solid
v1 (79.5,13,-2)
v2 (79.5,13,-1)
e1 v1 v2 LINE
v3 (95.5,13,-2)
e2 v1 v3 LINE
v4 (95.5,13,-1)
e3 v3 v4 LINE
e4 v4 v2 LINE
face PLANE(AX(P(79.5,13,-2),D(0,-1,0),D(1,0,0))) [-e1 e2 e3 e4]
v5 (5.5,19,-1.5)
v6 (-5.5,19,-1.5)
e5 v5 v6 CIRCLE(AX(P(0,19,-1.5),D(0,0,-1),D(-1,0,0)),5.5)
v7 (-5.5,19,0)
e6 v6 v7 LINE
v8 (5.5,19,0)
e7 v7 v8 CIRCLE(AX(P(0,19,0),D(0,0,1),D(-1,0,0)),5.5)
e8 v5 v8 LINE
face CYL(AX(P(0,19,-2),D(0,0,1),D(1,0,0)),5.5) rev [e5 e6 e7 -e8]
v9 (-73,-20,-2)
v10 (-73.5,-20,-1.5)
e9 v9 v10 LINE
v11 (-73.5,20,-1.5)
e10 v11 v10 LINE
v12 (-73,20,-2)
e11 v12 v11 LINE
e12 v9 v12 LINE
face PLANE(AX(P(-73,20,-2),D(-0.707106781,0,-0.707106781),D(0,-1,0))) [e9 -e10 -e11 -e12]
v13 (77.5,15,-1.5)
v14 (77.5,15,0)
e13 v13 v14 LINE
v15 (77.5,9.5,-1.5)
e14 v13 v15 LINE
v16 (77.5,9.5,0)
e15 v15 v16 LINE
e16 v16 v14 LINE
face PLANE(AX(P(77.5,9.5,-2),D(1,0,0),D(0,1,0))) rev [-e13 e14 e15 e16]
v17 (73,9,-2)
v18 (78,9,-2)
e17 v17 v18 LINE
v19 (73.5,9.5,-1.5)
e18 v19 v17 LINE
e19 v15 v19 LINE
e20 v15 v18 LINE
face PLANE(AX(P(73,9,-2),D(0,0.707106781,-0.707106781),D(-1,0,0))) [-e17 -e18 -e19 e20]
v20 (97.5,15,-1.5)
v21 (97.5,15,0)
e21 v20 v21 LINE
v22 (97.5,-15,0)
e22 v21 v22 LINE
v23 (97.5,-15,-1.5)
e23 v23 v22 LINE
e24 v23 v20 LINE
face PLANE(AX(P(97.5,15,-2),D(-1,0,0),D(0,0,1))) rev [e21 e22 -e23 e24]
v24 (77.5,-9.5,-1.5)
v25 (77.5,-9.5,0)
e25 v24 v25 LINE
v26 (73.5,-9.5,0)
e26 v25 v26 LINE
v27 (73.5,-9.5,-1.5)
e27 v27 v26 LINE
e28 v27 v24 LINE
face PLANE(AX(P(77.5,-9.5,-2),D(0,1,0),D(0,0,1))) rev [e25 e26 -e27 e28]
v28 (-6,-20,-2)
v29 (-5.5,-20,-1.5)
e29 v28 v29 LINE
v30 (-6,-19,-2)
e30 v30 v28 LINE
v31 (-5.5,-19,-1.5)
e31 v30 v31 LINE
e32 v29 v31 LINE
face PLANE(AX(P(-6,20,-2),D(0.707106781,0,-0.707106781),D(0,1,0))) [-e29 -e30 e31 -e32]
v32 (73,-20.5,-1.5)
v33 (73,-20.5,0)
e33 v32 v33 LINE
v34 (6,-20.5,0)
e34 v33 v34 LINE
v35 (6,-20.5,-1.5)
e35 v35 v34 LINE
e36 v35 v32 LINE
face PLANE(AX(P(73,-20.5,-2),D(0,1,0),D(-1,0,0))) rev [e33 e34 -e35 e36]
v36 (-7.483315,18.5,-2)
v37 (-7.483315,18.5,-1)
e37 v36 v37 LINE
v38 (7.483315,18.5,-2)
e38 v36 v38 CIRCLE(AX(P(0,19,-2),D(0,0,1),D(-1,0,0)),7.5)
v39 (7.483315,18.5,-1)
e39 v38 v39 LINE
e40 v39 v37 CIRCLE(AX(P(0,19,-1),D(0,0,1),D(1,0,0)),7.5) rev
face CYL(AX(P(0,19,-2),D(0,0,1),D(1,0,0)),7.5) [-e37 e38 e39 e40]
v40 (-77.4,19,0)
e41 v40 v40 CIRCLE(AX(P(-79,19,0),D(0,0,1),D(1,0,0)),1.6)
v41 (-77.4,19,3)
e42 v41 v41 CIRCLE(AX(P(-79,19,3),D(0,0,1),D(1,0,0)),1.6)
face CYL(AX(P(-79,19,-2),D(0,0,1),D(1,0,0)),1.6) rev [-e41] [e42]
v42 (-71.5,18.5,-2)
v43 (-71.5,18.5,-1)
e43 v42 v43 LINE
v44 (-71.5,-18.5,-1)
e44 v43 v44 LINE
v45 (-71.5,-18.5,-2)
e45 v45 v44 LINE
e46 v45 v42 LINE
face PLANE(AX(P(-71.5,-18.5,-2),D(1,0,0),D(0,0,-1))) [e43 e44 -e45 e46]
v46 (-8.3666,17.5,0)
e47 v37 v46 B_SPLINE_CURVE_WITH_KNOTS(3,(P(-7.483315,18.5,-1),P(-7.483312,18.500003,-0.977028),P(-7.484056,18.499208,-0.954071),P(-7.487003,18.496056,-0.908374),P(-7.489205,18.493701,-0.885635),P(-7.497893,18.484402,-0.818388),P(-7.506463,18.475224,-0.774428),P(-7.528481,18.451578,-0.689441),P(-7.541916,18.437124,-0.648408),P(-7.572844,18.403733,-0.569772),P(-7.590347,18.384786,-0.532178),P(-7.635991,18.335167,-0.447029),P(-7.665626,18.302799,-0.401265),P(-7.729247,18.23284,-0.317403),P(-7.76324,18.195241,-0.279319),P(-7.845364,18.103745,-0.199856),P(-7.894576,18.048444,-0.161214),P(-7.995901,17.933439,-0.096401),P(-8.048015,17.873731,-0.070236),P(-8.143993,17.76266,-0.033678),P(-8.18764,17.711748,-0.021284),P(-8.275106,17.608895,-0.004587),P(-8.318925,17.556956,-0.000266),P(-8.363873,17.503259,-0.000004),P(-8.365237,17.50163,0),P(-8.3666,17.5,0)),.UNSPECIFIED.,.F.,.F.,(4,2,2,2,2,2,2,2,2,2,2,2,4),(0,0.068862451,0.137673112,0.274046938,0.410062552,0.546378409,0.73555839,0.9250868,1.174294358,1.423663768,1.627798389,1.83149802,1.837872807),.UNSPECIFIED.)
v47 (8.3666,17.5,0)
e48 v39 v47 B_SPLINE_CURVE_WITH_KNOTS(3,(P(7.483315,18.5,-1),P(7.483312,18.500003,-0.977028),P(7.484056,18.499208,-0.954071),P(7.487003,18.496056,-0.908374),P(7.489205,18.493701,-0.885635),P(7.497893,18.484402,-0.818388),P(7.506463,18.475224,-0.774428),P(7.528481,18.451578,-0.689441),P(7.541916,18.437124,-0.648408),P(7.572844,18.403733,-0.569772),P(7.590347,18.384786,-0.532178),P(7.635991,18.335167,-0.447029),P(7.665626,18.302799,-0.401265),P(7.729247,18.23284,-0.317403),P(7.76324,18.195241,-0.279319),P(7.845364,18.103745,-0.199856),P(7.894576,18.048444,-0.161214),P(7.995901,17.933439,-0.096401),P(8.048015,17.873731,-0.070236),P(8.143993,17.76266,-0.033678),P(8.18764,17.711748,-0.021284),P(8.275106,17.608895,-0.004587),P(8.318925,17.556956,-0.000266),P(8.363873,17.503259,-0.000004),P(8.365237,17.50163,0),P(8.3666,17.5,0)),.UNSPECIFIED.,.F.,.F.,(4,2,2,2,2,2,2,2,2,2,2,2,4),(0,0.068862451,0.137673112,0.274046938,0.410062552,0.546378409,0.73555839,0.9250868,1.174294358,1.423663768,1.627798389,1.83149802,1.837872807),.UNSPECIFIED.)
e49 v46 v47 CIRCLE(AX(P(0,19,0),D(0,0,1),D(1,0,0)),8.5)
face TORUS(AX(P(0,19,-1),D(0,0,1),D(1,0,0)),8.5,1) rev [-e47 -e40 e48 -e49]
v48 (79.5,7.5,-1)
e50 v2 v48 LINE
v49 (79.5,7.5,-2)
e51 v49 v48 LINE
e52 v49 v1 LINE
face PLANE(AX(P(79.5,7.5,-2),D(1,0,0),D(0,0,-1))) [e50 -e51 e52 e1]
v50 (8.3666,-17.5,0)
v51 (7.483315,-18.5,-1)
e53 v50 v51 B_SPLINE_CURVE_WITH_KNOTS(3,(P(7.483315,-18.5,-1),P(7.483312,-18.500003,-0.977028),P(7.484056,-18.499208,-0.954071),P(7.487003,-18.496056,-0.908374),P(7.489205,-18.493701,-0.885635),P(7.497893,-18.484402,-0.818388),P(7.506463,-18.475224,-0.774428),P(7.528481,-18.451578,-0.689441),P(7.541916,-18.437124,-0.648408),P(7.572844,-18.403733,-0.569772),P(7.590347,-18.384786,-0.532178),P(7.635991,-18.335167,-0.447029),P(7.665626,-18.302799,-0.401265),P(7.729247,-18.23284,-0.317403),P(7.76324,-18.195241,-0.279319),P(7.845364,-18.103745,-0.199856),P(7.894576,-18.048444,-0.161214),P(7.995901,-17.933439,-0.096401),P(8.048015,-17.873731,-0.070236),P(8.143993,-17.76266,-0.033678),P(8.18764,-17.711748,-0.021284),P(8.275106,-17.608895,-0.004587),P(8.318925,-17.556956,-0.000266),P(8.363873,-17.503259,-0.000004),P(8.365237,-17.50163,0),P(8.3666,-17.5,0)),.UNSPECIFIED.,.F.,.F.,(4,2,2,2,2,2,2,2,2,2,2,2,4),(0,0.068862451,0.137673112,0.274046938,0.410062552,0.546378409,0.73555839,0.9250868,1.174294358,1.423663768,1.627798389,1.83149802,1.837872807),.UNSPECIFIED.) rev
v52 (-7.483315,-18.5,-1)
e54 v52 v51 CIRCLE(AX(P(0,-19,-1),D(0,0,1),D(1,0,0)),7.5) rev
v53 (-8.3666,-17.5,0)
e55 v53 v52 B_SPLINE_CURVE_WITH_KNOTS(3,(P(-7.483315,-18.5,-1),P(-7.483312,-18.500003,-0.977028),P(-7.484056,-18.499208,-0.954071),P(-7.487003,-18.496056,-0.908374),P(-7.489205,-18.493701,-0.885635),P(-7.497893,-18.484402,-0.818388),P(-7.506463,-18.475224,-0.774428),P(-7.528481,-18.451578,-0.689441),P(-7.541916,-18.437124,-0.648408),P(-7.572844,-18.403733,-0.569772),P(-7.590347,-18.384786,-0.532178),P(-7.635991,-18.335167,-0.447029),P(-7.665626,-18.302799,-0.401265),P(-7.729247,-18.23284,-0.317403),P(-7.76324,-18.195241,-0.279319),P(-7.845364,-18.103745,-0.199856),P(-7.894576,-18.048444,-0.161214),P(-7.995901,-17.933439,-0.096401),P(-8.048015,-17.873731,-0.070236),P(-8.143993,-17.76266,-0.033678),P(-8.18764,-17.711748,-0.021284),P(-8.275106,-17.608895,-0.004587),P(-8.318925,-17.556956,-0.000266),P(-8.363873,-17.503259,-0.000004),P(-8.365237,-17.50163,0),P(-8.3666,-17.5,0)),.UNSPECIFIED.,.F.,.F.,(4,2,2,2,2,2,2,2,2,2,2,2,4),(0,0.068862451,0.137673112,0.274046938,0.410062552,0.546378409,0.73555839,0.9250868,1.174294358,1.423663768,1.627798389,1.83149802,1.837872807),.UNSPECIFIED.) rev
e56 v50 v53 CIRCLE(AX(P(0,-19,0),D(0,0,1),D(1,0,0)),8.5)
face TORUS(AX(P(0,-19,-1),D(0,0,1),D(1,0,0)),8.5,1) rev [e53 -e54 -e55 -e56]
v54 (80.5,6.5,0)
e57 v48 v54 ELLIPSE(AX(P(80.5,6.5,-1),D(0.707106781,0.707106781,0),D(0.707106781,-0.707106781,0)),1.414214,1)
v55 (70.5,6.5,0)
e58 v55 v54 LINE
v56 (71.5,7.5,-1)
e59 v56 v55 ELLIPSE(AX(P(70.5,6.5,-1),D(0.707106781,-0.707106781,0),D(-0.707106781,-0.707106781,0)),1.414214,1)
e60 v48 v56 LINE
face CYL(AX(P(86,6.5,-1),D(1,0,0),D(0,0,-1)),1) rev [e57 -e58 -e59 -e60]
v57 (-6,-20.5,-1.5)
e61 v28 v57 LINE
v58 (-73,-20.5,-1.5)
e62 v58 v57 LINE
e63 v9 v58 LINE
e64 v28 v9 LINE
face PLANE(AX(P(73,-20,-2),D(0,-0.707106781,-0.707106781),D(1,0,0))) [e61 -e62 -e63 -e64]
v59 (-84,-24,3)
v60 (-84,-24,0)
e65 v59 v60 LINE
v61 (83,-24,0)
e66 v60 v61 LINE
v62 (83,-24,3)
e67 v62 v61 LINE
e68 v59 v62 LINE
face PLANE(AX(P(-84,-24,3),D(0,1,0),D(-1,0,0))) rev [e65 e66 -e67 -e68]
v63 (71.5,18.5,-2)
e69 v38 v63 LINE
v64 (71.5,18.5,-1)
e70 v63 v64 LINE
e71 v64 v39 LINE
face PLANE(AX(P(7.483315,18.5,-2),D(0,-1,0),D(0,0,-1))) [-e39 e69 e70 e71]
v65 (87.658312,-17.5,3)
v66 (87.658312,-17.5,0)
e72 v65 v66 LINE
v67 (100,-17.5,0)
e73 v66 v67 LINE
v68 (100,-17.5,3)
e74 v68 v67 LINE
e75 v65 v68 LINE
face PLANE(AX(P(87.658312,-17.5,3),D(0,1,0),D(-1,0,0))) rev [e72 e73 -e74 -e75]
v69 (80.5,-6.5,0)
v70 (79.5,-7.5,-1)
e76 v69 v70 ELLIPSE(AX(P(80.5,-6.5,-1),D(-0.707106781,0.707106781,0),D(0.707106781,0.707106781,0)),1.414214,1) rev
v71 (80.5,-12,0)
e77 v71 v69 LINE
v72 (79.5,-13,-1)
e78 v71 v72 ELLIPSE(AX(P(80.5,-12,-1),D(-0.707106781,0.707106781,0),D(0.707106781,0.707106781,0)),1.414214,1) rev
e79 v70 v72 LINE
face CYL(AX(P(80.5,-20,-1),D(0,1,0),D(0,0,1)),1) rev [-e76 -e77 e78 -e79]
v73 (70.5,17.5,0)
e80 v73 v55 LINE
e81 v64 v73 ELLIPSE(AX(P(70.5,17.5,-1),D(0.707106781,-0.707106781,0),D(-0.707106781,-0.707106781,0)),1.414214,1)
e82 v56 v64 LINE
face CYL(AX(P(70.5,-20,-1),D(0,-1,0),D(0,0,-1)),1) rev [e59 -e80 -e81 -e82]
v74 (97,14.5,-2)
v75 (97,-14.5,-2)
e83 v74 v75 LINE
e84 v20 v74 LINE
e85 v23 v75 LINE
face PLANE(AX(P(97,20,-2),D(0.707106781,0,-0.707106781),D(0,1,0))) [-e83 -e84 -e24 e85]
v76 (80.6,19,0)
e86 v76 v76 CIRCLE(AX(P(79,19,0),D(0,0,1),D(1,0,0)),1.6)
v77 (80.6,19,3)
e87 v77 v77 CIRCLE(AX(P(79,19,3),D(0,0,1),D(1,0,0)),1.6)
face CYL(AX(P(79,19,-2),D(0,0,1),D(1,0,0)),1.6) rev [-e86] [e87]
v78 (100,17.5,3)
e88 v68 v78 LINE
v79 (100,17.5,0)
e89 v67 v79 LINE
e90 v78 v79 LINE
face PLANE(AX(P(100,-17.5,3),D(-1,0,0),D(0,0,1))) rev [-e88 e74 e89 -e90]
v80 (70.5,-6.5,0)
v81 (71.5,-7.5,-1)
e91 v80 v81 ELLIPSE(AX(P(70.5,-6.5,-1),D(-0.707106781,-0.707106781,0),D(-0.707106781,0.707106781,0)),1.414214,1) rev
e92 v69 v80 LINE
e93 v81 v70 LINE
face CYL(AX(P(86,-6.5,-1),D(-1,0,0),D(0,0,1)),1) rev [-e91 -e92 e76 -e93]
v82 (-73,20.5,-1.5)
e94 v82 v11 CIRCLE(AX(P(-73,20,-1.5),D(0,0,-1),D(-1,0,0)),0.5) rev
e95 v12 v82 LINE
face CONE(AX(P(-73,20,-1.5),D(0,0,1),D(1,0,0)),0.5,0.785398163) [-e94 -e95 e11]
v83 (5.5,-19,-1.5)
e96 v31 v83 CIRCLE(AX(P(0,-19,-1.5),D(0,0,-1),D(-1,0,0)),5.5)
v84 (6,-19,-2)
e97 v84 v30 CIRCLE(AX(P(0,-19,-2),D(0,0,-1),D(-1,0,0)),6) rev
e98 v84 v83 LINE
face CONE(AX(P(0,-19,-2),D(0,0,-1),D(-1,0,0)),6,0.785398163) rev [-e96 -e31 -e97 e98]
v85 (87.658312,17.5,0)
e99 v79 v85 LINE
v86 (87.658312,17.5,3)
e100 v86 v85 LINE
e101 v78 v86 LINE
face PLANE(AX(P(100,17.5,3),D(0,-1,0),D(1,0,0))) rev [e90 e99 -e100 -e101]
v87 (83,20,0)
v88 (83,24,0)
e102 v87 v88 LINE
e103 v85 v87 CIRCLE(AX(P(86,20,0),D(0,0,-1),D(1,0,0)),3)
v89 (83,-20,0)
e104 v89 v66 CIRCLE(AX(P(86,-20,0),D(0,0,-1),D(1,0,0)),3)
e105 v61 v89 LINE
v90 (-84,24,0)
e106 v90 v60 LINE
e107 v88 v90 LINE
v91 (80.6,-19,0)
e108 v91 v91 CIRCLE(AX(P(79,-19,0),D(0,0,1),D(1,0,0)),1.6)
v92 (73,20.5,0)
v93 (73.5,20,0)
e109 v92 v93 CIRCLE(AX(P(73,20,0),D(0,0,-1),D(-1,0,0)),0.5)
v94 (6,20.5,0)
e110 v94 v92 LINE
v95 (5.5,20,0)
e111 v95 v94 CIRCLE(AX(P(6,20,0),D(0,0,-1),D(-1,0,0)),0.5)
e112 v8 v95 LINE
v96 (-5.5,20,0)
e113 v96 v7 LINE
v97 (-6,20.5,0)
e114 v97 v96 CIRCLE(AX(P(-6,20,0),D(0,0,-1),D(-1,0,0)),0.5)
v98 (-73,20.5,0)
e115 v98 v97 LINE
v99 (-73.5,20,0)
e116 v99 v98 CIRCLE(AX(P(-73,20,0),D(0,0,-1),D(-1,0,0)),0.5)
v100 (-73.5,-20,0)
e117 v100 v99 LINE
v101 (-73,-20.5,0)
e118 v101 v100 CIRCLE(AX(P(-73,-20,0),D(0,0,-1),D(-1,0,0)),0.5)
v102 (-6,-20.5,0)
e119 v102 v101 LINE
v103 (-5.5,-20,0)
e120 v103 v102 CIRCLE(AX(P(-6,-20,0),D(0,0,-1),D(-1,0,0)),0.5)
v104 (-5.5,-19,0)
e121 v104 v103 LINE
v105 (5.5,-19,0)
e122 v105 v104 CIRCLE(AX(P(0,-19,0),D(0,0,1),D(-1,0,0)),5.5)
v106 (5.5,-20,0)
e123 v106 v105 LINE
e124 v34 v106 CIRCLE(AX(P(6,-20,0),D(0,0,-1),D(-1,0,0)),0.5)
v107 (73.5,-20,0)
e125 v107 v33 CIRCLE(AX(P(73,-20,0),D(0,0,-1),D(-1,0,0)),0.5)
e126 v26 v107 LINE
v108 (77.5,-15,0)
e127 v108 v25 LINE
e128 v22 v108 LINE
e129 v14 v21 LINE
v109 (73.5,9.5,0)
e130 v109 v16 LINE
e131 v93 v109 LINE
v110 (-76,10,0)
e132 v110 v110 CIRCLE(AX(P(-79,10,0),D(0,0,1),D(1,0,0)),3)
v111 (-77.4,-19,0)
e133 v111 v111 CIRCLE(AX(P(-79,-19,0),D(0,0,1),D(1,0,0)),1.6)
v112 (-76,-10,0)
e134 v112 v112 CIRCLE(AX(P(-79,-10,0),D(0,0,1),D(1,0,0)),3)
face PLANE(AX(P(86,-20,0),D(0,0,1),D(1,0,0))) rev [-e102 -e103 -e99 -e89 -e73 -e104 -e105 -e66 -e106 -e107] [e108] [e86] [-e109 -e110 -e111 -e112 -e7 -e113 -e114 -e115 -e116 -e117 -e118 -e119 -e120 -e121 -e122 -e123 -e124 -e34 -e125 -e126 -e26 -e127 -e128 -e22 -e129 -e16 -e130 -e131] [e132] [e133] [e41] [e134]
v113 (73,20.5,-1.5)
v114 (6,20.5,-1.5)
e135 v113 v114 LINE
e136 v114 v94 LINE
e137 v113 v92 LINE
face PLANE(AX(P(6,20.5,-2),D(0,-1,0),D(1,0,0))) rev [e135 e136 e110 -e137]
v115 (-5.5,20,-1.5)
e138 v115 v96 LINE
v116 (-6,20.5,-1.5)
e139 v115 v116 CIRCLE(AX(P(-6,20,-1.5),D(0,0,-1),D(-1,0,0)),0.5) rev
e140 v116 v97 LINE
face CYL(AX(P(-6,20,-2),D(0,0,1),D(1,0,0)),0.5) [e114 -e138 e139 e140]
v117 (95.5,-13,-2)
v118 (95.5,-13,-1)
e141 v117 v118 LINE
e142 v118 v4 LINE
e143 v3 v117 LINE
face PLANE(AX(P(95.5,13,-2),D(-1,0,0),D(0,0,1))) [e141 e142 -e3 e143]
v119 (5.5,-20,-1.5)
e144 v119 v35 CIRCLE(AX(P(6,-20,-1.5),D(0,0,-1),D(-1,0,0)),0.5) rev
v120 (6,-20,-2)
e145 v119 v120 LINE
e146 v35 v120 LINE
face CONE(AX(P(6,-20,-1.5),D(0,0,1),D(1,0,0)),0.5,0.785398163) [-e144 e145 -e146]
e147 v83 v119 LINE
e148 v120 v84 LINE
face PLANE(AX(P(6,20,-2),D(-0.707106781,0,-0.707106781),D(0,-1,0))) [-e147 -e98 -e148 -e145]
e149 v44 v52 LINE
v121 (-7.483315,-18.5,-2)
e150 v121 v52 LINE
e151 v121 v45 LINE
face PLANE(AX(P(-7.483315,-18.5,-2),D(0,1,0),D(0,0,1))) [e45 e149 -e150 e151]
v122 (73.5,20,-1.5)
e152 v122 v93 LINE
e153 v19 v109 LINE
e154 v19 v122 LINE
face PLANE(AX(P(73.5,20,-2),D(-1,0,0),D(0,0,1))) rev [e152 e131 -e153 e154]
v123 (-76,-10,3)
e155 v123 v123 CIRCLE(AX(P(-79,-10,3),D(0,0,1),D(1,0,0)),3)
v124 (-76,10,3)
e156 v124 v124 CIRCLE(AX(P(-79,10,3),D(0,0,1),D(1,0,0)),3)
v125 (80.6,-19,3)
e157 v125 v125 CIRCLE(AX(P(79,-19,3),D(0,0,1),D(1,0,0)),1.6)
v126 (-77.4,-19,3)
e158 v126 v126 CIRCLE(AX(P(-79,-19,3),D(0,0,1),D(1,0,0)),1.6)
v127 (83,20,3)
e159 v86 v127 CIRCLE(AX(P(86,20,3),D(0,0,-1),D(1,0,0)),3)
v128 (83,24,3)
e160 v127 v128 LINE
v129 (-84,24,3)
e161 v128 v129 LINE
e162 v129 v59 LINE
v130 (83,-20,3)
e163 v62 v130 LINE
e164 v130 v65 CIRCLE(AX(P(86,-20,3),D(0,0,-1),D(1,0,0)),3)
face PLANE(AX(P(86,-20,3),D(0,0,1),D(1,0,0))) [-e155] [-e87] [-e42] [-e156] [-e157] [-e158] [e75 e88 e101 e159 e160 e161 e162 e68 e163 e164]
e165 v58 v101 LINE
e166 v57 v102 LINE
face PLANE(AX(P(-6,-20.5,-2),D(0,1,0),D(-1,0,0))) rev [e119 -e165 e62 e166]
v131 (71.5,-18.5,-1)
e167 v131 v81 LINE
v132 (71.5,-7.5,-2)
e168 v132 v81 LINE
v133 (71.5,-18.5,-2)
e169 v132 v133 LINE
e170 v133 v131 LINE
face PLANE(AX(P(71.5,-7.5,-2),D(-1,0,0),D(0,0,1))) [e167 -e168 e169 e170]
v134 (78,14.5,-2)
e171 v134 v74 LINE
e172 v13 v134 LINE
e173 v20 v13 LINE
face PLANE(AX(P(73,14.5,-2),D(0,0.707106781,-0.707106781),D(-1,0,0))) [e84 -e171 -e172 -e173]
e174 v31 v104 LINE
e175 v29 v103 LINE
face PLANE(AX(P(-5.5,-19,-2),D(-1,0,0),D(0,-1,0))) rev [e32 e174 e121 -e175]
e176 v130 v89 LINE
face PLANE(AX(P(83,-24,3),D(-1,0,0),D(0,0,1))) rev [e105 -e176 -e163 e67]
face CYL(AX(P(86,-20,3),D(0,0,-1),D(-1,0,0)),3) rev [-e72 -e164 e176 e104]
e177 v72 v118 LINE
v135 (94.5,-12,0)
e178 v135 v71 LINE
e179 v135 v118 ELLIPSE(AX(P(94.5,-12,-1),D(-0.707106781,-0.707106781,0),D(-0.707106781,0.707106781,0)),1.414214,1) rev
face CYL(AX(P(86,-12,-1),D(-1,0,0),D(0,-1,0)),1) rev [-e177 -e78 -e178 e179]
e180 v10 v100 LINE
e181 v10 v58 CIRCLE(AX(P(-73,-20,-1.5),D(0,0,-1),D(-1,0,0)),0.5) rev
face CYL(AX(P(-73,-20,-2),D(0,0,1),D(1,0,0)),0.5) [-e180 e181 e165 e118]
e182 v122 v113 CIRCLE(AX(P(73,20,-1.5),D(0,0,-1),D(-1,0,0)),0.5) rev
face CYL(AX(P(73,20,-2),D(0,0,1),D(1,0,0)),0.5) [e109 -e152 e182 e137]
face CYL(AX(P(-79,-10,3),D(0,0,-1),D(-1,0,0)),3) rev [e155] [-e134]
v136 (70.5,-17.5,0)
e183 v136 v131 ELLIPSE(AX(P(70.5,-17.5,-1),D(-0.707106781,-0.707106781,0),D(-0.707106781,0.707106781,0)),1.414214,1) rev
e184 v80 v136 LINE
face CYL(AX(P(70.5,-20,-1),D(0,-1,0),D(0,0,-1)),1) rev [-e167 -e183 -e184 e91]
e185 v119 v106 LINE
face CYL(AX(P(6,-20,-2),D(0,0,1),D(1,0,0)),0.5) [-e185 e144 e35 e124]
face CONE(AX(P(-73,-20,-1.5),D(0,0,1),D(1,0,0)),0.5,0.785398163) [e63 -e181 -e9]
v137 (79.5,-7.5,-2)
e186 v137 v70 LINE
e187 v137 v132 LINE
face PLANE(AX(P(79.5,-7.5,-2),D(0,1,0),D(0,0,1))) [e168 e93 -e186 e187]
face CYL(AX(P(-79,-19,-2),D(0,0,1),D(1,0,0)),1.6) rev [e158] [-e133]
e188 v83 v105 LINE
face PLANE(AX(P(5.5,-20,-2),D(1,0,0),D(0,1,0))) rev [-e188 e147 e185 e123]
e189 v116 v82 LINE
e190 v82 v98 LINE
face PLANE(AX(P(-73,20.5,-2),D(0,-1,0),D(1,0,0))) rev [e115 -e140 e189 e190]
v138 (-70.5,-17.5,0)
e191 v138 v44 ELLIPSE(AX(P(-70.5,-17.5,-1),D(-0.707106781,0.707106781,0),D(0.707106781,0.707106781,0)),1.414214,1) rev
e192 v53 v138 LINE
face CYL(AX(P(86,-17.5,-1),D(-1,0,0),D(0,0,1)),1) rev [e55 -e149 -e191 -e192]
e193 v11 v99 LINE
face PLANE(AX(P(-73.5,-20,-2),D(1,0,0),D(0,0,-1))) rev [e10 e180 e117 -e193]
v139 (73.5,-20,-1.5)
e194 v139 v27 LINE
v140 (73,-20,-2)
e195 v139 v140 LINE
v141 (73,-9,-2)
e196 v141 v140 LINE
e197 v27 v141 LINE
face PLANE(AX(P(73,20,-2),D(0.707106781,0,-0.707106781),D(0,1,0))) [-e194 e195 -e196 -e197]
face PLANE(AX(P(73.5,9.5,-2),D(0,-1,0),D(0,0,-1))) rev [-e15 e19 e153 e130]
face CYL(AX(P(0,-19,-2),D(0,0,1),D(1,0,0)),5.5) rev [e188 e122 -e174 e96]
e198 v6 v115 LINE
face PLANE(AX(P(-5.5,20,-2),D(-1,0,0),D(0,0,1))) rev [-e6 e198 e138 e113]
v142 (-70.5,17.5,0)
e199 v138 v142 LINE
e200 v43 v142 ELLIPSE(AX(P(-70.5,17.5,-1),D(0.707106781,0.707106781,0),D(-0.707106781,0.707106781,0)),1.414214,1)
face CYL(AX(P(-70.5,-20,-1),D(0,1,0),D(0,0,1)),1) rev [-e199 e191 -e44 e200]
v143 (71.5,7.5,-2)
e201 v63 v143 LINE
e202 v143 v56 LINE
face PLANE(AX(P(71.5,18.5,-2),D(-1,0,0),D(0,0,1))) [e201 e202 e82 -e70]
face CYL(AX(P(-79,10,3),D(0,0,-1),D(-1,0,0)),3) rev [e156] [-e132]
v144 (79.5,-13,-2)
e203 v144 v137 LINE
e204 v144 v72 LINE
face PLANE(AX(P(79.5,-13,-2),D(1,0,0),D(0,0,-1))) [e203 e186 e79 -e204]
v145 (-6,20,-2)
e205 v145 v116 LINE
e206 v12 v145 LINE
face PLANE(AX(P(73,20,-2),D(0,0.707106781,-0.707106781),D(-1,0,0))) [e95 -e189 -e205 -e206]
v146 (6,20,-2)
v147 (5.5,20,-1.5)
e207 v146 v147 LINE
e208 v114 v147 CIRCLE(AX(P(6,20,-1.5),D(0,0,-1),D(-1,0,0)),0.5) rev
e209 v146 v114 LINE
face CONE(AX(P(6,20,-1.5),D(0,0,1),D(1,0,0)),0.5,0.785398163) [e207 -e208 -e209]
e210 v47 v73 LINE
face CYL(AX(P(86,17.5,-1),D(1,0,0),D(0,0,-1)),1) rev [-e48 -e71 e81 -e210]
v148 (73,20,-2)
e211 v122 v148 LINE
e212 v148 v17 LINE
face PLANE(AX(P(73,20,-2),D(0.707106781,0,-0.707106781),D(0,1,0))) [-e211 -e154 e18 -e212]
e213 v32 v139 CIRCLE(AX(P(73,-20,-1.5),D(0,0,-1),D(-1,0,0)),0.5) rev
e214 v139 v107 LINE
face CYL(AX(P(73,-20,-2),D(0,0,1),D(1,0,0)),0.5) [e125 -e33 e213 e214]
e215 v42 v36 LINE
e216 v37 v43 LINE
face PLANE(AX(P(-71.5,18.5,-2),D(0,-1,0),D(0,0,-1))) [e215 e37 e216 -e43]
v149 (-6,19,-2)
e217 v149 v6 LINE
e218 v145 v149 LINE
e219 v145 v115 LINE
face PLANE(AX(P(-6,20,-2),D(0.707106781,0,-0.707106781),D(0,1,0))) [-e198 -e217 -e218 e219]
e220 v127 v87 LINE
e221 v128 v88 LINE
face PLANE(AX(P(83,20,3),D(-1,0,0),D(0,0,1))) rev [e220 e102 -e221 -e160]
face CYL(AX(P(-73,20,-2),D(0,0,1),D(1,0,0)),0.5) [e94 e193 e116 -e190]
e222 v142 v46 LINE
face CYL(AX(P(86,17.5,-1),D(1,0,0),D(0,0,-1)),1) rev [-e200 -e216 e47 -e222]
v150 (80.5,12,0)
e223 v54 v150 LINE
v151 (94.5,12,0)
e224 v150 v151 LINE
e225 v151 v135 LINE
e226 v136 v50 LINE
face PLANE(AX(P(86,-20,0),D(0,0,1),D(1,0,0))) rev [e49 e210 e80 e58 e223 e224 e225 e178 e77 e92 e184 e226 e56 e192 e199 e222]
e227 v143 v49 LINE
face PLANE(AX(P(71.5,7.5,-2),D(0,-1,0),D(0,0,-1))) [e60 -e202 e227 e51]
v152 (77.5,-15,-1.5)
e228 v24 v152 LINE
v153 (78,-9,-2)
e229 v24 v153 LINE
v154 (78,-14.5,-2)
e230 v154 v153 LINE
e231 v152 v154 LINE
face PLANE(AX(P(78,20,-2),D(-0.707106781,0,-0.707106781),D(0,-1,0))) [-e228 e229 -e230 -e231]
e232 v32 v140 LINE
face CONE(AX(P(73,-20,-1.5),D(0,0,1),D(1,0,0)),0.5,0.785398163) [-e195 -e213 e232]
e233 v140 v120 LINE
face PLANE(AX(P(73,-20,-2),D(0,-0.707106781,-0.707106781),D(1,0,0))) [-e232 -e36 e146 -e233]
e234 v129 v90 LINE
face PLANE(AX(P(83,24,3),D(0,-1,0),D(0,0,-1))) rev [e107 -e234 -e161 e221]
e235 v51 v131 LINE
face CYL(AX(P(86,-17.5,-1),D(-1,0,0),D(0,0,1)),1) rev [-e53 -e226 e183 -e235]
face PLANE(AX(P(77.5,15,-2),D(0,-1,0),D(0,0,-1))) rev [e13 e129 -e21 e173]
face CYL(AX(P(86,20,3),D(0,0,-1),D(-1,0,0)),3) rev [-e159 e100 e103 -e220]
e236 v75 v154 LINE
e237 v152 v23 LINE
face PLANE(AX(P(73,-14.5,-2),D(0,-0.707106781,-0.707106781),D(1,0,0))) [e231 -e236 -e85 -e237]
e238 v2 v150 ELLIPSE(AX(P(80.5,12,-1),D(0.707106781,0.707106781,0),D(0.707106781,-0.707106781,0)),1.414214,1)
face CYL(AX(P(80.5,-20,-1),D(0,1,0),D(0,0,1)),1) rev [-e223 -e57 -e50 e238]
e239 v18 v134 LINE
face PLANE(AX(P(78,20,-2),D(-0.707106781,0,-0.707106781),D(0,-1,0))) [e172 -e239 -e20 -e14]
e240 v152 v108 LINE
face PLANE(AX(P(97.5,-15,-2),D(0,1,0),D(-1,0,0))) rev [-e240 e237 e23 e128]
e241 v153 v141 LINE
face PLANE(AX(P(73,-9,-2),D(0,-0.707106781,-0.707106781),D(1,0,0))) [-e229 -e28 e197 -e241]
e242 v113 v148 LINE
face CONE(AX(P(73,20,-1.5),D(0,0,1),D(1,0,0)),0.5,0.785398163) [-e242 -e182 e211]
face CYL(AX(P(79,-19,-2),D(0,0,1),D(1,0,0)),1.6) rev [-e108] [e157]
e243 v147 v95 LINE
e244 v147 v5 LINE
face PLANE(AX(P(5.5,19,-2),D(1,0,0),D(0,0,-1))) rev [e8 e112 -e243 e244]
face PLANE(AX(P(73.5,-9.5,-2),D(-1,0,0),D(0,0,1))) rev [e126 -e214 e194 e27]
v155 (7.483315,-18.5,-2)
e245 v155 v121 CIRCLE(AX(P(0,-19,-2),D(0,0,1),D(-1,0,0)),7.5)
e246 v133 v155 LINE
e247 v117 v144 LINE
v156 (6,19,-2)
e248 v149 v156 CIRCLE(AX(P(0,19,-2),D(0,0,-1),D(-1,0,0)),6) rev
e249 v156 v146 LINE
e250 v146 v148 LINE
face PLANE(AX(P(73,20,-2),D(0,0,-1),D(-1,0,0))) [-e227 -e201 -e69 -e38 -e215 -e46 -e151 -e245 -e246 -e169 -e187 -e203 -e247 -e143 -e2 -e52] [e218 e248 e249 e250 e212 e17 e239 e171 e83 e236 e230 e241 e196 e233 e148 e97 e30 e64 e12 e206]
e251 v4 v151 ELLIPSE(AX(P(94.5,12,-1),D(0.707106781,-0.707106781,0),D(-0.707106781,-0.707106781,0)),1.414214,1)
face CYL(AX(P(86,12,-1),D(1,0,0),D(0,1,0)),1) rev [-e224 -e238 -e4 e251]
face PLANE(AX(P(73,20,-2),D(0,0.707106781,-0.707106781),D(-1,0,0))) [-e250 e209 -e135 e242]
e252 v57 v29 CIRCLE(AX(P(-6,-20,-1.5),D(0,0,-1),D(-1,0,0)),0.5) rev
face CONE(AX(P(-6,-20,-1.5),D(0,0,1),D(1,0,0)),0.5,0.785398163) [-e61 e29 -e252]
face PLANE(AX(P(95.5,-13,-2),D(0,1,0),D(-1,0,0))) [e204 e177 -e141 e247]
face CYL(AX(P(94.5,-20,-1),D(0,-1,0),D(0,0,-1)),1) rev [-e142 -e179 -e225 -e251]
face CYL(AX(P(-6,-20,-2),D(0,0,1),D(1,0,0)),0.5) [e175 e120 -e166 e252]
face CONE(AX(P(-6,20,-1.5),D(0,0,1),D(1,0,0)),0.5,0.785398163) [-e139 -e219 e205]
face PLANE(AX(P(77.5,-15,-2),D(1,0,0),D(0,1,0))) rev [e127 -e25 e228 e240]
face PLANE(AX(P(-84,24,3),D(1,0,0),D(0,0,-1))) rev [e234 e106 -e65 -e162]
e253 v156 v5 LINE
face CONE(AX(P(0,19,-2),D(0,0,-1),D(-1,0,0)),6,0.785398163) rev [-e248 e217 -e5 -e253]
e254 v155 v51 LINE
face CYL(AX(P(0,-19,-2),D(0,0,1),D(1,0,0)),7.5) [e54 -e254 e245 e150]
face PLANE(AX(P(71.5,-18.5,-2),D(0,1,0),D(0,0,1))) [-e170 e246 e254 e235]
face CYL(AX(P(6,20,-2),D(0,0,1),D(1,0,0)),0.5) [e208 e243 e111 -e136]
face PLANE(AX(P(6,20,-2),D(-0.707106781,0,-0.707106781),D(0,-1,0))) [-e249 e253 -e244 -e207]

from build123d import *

# Parameters (mm, degrees)
SKETCH1_R           = 3
BOSS_EXTRUDE1_DEPTH = 3
BOSS_EXTRUDE2_DEPTH = 2
CHAMFER1_SIZE       = 0.5
FILLET1_R           = 1
SKETCH3_R           = 1.6
CUT_EXTRUDE1_DEPTH  = 103.961157725


with BuildPart() as part:
    # Sketch1 → Boss-Extrude1 (new body)
    with BuildSketch(Plane.XY):
        with BuildLine():
            Line((87.658312395, -17.5), (100, -17.5))
            Line((100, -17.5), (100, 17.5))
            Line((100, 17.5), (87.658312395, 17.5))
            ThreePointArc((87.658312395, 17.5), (84.581362835, 17.356617963), (83, 20))
            Line((83, 20), (83, 24))
            Line((83, 24), (-84, 24))
            Line((-84, 24), (-84, -24))
            Line((-84, -24), (83, -24))
            Line((83, -24), (83, -20))
            ThreePointArc((83, -20), (84.581362835, -17.356617963), (87.658312395, -17.5))
        make_face()
        with Locations((-79, -10)):
            Circle(SKETCH1_R, mode=Mode.SUBTRACT)
        with Locations((-79, 10)):
            Circle(SKETCH1_R, mode=Mode.SUBTRACT)
    extrude(amount=BOSS_EXTRUDE1_DEPTH)

    # Sketch2 → Boss-Extrude2 (add)
    with BuildSketch(Plane(origin=(0, 0, 0), x_dir=(-1, 0, 0), z_dir=(0, 0, -1))):
        with BuildLine():
            Line((-73.5, 20), (-73.5, 9.5))
            Line((-73.5, 9.5), (-77.5, 9.5))
            Line((-77.5, 9.5), (-77.5, 15))
            Line((-77.5, 15), (-97.5, 15))
            Line((-97.5, 15), (-97.5, -15))
            Line((-97.5, -15), (-77.5, -15))
            Line((-77.5, -15), (-77.5, -9.5))
            Line((-77.5, -9.5), (-73.5, -9.5))
            Line((-73.5, -9.5), (-73.5, -20))
            ThreePointArc((-73.5, -20), (-73.353553391, -20.353553391), (-73, -20.5))
            Line((-73, -20.5), (-6, -20.5))
            ThreePointArc((-6, -20.5), (-5.646446609, -20.353553391), (-5.5, -20))
            Line((-5.5, -20), (-5.5, -19))
            ThreePointArc((-5.5, -19), (0, -13.5), (5.5, -19))
            Line((5.5, -19), (5.5, -20))
            ThreePointArc((5.5, -20), (5.646446609, -20.353553391), (6, -20.5))
            Line((6, -20.5), (73, -20.5))
            ThreePointArc((73, -20.5), (73.353553391, -20.353553391), (73.5, -20))
            Line((73.5, -20), (73.5, 20))
            ThreePointArc((73.5, 20), (73.353553391, 20.353553391), (73, 20.5))
            Line((73, 20.5), (6, 20.5))
            ThreePointArc((6, 20.5), (5.646446609, 20.353553391), (5.5, 20))
            Line((5.5, 20), (5.5, 19))
            ThreePointArc((5.5, 19), (0, 13.5), (-5.5, 19))
            Line((-5.5, 19), (-5.5, 20))
            ThreePointArc((-5.5, 20), (-5.646446609, 20.353553391), (-6, 20.5))
            Line((-6, 20.5), (-73, 20.5))
            ThreePointArc((-73, 20.5), (-73.353553391, 20.353553391), (-73.5, 20))
        make_face()
        with BuildLine():
            Line((-7.483314774, 18.5), (-71.5, 18.5))
            Line((-71.5, 18.5), (-71.5, 7.5))
            Line((-71.5, 7.5), (-79.5, 7.5))
            Line((-79.5, 7.5), (-79.5, 13))
            Line((-79.5, 13), (-95.5, 13))
            Line((-95.5, 13), (-95.5, -13))
            Line((-95.5, -13), (-79.5, -13))
            Line((-79.5, -13), (-79.5, -7.5))
            Line((-79.5, -7.5), (-71.5, -7.5))
            Line((-71.5, -7.5), (-71.5, -18.5))
            Line((-71.5, -18.5), (-7.483314774, -18.5))
            ThreePointArc((-7.483314774, -18.5), (0, -11.5), (7.483314774, -18.5))
            Line((7.483314774, -18.5), (71.5, -18.5))
            Line((71.5, -18.5), (71.5, 18.5))
            Line((71.5, 18.5), (7.483314774, 18.5))
            ThreePointArc((7.483314774, 18.5), (0, 11.5), (-7.483314774, 18.5))
        make_face(mode=Mode.SUBTRACT)
    extrude(amount=BOSS_EXTRUDE2_DEPTH)

    # Chamfer1
    chamfer1_edges = [part.edges().sort_by_distance(p)[0] for p in [
        (73.353553391, 20.353553391, -2),
        (73.5, 14.75, -2),
        (75.5, 9.5, -2),
        (77.5, 12.25, -2),
        (87.5, 15, -2),
        (97.5, 0, -2),
        (87.5, -15, -2),
        (77.5, -12.25, -2),
        (75.5, -9.5, -2),
        (73.5, -14.75, -2),
        (73.353553391, -20.353553391, -2),
        (39.5, -20.5, -2),
        (5.646446609, -20.353553391, -2),
        (5.5, -19.5, -2),
        (0, -13.5, -2),
        (-5.5, -19.5, -2),
        (-5.646446609, -20.353553391, -2),
        (-39.5, -20.5, -2),
        (-73.353553391, -20.353553391, -2),
        (-73.5, 0, -2),
        (-73.353553391, 20.353553391, -2),
        (-39.5, 20.5, -2),
        (-5.646446609, 20.353553391, -2),
        (-5.5, 19.5, -2),
        (0, 13.5, -2),
        (5.5, 19.5, -2),
        (5.646446609, 20.353553391, -2),
        (39.5, 20.5, -2),
    ]]
    chamfer(chamfer1_edges, length=CHAMFER1_SIZE - 0.0001)  # a hair under: the kernel refuses the full size

    # Fillet1
    fillet1_edges = [part.edges().sort_by_distance(p)[0] for p in [
        (0, 11.5, 0),
        (39.491657387, 18.5, 0),
        (71.5, 13, 0),
        (75.5, 7.5, 0),
        (79.5, 10.25, 0),
        (87.5, 13, 0),
        (95.5, 0, 0),
        (87.5, -13, 0),
        (79.5, -10.25, 0),
        (75.5, -7.5, 0),
        (71.5, -13, 0),
        (39.491657387, -18.5, 0),
        (0, -11.5, 0),
        (-39.491657387, -18.5, 0),
        (-71.5, 0, 0),
        (-39.491657387, 18.5, 0),
    ]]
    fillet(fillet1_edges, radius=FILLET1_R)

    # Sketch3 → Cut-Extrude1 (cut, through all)
    with BuildSketch(Plane.XY.offset(3)):
        with Locations((-79, 19)):
            Circle(SKETCH3_R)
        with Locations((-79, -19)):
            Circle(SKETCH3_R)
        with Locations((79, 19)):
            Circle(SKETCH3_R)
        with Locations((79, -19)):
            Circle(SKETCH3_R)
    extrude(amount=-CUT_EXTRUDE1_DEPTH, mode=Mode.SUBTRACT)


solid = part.part
